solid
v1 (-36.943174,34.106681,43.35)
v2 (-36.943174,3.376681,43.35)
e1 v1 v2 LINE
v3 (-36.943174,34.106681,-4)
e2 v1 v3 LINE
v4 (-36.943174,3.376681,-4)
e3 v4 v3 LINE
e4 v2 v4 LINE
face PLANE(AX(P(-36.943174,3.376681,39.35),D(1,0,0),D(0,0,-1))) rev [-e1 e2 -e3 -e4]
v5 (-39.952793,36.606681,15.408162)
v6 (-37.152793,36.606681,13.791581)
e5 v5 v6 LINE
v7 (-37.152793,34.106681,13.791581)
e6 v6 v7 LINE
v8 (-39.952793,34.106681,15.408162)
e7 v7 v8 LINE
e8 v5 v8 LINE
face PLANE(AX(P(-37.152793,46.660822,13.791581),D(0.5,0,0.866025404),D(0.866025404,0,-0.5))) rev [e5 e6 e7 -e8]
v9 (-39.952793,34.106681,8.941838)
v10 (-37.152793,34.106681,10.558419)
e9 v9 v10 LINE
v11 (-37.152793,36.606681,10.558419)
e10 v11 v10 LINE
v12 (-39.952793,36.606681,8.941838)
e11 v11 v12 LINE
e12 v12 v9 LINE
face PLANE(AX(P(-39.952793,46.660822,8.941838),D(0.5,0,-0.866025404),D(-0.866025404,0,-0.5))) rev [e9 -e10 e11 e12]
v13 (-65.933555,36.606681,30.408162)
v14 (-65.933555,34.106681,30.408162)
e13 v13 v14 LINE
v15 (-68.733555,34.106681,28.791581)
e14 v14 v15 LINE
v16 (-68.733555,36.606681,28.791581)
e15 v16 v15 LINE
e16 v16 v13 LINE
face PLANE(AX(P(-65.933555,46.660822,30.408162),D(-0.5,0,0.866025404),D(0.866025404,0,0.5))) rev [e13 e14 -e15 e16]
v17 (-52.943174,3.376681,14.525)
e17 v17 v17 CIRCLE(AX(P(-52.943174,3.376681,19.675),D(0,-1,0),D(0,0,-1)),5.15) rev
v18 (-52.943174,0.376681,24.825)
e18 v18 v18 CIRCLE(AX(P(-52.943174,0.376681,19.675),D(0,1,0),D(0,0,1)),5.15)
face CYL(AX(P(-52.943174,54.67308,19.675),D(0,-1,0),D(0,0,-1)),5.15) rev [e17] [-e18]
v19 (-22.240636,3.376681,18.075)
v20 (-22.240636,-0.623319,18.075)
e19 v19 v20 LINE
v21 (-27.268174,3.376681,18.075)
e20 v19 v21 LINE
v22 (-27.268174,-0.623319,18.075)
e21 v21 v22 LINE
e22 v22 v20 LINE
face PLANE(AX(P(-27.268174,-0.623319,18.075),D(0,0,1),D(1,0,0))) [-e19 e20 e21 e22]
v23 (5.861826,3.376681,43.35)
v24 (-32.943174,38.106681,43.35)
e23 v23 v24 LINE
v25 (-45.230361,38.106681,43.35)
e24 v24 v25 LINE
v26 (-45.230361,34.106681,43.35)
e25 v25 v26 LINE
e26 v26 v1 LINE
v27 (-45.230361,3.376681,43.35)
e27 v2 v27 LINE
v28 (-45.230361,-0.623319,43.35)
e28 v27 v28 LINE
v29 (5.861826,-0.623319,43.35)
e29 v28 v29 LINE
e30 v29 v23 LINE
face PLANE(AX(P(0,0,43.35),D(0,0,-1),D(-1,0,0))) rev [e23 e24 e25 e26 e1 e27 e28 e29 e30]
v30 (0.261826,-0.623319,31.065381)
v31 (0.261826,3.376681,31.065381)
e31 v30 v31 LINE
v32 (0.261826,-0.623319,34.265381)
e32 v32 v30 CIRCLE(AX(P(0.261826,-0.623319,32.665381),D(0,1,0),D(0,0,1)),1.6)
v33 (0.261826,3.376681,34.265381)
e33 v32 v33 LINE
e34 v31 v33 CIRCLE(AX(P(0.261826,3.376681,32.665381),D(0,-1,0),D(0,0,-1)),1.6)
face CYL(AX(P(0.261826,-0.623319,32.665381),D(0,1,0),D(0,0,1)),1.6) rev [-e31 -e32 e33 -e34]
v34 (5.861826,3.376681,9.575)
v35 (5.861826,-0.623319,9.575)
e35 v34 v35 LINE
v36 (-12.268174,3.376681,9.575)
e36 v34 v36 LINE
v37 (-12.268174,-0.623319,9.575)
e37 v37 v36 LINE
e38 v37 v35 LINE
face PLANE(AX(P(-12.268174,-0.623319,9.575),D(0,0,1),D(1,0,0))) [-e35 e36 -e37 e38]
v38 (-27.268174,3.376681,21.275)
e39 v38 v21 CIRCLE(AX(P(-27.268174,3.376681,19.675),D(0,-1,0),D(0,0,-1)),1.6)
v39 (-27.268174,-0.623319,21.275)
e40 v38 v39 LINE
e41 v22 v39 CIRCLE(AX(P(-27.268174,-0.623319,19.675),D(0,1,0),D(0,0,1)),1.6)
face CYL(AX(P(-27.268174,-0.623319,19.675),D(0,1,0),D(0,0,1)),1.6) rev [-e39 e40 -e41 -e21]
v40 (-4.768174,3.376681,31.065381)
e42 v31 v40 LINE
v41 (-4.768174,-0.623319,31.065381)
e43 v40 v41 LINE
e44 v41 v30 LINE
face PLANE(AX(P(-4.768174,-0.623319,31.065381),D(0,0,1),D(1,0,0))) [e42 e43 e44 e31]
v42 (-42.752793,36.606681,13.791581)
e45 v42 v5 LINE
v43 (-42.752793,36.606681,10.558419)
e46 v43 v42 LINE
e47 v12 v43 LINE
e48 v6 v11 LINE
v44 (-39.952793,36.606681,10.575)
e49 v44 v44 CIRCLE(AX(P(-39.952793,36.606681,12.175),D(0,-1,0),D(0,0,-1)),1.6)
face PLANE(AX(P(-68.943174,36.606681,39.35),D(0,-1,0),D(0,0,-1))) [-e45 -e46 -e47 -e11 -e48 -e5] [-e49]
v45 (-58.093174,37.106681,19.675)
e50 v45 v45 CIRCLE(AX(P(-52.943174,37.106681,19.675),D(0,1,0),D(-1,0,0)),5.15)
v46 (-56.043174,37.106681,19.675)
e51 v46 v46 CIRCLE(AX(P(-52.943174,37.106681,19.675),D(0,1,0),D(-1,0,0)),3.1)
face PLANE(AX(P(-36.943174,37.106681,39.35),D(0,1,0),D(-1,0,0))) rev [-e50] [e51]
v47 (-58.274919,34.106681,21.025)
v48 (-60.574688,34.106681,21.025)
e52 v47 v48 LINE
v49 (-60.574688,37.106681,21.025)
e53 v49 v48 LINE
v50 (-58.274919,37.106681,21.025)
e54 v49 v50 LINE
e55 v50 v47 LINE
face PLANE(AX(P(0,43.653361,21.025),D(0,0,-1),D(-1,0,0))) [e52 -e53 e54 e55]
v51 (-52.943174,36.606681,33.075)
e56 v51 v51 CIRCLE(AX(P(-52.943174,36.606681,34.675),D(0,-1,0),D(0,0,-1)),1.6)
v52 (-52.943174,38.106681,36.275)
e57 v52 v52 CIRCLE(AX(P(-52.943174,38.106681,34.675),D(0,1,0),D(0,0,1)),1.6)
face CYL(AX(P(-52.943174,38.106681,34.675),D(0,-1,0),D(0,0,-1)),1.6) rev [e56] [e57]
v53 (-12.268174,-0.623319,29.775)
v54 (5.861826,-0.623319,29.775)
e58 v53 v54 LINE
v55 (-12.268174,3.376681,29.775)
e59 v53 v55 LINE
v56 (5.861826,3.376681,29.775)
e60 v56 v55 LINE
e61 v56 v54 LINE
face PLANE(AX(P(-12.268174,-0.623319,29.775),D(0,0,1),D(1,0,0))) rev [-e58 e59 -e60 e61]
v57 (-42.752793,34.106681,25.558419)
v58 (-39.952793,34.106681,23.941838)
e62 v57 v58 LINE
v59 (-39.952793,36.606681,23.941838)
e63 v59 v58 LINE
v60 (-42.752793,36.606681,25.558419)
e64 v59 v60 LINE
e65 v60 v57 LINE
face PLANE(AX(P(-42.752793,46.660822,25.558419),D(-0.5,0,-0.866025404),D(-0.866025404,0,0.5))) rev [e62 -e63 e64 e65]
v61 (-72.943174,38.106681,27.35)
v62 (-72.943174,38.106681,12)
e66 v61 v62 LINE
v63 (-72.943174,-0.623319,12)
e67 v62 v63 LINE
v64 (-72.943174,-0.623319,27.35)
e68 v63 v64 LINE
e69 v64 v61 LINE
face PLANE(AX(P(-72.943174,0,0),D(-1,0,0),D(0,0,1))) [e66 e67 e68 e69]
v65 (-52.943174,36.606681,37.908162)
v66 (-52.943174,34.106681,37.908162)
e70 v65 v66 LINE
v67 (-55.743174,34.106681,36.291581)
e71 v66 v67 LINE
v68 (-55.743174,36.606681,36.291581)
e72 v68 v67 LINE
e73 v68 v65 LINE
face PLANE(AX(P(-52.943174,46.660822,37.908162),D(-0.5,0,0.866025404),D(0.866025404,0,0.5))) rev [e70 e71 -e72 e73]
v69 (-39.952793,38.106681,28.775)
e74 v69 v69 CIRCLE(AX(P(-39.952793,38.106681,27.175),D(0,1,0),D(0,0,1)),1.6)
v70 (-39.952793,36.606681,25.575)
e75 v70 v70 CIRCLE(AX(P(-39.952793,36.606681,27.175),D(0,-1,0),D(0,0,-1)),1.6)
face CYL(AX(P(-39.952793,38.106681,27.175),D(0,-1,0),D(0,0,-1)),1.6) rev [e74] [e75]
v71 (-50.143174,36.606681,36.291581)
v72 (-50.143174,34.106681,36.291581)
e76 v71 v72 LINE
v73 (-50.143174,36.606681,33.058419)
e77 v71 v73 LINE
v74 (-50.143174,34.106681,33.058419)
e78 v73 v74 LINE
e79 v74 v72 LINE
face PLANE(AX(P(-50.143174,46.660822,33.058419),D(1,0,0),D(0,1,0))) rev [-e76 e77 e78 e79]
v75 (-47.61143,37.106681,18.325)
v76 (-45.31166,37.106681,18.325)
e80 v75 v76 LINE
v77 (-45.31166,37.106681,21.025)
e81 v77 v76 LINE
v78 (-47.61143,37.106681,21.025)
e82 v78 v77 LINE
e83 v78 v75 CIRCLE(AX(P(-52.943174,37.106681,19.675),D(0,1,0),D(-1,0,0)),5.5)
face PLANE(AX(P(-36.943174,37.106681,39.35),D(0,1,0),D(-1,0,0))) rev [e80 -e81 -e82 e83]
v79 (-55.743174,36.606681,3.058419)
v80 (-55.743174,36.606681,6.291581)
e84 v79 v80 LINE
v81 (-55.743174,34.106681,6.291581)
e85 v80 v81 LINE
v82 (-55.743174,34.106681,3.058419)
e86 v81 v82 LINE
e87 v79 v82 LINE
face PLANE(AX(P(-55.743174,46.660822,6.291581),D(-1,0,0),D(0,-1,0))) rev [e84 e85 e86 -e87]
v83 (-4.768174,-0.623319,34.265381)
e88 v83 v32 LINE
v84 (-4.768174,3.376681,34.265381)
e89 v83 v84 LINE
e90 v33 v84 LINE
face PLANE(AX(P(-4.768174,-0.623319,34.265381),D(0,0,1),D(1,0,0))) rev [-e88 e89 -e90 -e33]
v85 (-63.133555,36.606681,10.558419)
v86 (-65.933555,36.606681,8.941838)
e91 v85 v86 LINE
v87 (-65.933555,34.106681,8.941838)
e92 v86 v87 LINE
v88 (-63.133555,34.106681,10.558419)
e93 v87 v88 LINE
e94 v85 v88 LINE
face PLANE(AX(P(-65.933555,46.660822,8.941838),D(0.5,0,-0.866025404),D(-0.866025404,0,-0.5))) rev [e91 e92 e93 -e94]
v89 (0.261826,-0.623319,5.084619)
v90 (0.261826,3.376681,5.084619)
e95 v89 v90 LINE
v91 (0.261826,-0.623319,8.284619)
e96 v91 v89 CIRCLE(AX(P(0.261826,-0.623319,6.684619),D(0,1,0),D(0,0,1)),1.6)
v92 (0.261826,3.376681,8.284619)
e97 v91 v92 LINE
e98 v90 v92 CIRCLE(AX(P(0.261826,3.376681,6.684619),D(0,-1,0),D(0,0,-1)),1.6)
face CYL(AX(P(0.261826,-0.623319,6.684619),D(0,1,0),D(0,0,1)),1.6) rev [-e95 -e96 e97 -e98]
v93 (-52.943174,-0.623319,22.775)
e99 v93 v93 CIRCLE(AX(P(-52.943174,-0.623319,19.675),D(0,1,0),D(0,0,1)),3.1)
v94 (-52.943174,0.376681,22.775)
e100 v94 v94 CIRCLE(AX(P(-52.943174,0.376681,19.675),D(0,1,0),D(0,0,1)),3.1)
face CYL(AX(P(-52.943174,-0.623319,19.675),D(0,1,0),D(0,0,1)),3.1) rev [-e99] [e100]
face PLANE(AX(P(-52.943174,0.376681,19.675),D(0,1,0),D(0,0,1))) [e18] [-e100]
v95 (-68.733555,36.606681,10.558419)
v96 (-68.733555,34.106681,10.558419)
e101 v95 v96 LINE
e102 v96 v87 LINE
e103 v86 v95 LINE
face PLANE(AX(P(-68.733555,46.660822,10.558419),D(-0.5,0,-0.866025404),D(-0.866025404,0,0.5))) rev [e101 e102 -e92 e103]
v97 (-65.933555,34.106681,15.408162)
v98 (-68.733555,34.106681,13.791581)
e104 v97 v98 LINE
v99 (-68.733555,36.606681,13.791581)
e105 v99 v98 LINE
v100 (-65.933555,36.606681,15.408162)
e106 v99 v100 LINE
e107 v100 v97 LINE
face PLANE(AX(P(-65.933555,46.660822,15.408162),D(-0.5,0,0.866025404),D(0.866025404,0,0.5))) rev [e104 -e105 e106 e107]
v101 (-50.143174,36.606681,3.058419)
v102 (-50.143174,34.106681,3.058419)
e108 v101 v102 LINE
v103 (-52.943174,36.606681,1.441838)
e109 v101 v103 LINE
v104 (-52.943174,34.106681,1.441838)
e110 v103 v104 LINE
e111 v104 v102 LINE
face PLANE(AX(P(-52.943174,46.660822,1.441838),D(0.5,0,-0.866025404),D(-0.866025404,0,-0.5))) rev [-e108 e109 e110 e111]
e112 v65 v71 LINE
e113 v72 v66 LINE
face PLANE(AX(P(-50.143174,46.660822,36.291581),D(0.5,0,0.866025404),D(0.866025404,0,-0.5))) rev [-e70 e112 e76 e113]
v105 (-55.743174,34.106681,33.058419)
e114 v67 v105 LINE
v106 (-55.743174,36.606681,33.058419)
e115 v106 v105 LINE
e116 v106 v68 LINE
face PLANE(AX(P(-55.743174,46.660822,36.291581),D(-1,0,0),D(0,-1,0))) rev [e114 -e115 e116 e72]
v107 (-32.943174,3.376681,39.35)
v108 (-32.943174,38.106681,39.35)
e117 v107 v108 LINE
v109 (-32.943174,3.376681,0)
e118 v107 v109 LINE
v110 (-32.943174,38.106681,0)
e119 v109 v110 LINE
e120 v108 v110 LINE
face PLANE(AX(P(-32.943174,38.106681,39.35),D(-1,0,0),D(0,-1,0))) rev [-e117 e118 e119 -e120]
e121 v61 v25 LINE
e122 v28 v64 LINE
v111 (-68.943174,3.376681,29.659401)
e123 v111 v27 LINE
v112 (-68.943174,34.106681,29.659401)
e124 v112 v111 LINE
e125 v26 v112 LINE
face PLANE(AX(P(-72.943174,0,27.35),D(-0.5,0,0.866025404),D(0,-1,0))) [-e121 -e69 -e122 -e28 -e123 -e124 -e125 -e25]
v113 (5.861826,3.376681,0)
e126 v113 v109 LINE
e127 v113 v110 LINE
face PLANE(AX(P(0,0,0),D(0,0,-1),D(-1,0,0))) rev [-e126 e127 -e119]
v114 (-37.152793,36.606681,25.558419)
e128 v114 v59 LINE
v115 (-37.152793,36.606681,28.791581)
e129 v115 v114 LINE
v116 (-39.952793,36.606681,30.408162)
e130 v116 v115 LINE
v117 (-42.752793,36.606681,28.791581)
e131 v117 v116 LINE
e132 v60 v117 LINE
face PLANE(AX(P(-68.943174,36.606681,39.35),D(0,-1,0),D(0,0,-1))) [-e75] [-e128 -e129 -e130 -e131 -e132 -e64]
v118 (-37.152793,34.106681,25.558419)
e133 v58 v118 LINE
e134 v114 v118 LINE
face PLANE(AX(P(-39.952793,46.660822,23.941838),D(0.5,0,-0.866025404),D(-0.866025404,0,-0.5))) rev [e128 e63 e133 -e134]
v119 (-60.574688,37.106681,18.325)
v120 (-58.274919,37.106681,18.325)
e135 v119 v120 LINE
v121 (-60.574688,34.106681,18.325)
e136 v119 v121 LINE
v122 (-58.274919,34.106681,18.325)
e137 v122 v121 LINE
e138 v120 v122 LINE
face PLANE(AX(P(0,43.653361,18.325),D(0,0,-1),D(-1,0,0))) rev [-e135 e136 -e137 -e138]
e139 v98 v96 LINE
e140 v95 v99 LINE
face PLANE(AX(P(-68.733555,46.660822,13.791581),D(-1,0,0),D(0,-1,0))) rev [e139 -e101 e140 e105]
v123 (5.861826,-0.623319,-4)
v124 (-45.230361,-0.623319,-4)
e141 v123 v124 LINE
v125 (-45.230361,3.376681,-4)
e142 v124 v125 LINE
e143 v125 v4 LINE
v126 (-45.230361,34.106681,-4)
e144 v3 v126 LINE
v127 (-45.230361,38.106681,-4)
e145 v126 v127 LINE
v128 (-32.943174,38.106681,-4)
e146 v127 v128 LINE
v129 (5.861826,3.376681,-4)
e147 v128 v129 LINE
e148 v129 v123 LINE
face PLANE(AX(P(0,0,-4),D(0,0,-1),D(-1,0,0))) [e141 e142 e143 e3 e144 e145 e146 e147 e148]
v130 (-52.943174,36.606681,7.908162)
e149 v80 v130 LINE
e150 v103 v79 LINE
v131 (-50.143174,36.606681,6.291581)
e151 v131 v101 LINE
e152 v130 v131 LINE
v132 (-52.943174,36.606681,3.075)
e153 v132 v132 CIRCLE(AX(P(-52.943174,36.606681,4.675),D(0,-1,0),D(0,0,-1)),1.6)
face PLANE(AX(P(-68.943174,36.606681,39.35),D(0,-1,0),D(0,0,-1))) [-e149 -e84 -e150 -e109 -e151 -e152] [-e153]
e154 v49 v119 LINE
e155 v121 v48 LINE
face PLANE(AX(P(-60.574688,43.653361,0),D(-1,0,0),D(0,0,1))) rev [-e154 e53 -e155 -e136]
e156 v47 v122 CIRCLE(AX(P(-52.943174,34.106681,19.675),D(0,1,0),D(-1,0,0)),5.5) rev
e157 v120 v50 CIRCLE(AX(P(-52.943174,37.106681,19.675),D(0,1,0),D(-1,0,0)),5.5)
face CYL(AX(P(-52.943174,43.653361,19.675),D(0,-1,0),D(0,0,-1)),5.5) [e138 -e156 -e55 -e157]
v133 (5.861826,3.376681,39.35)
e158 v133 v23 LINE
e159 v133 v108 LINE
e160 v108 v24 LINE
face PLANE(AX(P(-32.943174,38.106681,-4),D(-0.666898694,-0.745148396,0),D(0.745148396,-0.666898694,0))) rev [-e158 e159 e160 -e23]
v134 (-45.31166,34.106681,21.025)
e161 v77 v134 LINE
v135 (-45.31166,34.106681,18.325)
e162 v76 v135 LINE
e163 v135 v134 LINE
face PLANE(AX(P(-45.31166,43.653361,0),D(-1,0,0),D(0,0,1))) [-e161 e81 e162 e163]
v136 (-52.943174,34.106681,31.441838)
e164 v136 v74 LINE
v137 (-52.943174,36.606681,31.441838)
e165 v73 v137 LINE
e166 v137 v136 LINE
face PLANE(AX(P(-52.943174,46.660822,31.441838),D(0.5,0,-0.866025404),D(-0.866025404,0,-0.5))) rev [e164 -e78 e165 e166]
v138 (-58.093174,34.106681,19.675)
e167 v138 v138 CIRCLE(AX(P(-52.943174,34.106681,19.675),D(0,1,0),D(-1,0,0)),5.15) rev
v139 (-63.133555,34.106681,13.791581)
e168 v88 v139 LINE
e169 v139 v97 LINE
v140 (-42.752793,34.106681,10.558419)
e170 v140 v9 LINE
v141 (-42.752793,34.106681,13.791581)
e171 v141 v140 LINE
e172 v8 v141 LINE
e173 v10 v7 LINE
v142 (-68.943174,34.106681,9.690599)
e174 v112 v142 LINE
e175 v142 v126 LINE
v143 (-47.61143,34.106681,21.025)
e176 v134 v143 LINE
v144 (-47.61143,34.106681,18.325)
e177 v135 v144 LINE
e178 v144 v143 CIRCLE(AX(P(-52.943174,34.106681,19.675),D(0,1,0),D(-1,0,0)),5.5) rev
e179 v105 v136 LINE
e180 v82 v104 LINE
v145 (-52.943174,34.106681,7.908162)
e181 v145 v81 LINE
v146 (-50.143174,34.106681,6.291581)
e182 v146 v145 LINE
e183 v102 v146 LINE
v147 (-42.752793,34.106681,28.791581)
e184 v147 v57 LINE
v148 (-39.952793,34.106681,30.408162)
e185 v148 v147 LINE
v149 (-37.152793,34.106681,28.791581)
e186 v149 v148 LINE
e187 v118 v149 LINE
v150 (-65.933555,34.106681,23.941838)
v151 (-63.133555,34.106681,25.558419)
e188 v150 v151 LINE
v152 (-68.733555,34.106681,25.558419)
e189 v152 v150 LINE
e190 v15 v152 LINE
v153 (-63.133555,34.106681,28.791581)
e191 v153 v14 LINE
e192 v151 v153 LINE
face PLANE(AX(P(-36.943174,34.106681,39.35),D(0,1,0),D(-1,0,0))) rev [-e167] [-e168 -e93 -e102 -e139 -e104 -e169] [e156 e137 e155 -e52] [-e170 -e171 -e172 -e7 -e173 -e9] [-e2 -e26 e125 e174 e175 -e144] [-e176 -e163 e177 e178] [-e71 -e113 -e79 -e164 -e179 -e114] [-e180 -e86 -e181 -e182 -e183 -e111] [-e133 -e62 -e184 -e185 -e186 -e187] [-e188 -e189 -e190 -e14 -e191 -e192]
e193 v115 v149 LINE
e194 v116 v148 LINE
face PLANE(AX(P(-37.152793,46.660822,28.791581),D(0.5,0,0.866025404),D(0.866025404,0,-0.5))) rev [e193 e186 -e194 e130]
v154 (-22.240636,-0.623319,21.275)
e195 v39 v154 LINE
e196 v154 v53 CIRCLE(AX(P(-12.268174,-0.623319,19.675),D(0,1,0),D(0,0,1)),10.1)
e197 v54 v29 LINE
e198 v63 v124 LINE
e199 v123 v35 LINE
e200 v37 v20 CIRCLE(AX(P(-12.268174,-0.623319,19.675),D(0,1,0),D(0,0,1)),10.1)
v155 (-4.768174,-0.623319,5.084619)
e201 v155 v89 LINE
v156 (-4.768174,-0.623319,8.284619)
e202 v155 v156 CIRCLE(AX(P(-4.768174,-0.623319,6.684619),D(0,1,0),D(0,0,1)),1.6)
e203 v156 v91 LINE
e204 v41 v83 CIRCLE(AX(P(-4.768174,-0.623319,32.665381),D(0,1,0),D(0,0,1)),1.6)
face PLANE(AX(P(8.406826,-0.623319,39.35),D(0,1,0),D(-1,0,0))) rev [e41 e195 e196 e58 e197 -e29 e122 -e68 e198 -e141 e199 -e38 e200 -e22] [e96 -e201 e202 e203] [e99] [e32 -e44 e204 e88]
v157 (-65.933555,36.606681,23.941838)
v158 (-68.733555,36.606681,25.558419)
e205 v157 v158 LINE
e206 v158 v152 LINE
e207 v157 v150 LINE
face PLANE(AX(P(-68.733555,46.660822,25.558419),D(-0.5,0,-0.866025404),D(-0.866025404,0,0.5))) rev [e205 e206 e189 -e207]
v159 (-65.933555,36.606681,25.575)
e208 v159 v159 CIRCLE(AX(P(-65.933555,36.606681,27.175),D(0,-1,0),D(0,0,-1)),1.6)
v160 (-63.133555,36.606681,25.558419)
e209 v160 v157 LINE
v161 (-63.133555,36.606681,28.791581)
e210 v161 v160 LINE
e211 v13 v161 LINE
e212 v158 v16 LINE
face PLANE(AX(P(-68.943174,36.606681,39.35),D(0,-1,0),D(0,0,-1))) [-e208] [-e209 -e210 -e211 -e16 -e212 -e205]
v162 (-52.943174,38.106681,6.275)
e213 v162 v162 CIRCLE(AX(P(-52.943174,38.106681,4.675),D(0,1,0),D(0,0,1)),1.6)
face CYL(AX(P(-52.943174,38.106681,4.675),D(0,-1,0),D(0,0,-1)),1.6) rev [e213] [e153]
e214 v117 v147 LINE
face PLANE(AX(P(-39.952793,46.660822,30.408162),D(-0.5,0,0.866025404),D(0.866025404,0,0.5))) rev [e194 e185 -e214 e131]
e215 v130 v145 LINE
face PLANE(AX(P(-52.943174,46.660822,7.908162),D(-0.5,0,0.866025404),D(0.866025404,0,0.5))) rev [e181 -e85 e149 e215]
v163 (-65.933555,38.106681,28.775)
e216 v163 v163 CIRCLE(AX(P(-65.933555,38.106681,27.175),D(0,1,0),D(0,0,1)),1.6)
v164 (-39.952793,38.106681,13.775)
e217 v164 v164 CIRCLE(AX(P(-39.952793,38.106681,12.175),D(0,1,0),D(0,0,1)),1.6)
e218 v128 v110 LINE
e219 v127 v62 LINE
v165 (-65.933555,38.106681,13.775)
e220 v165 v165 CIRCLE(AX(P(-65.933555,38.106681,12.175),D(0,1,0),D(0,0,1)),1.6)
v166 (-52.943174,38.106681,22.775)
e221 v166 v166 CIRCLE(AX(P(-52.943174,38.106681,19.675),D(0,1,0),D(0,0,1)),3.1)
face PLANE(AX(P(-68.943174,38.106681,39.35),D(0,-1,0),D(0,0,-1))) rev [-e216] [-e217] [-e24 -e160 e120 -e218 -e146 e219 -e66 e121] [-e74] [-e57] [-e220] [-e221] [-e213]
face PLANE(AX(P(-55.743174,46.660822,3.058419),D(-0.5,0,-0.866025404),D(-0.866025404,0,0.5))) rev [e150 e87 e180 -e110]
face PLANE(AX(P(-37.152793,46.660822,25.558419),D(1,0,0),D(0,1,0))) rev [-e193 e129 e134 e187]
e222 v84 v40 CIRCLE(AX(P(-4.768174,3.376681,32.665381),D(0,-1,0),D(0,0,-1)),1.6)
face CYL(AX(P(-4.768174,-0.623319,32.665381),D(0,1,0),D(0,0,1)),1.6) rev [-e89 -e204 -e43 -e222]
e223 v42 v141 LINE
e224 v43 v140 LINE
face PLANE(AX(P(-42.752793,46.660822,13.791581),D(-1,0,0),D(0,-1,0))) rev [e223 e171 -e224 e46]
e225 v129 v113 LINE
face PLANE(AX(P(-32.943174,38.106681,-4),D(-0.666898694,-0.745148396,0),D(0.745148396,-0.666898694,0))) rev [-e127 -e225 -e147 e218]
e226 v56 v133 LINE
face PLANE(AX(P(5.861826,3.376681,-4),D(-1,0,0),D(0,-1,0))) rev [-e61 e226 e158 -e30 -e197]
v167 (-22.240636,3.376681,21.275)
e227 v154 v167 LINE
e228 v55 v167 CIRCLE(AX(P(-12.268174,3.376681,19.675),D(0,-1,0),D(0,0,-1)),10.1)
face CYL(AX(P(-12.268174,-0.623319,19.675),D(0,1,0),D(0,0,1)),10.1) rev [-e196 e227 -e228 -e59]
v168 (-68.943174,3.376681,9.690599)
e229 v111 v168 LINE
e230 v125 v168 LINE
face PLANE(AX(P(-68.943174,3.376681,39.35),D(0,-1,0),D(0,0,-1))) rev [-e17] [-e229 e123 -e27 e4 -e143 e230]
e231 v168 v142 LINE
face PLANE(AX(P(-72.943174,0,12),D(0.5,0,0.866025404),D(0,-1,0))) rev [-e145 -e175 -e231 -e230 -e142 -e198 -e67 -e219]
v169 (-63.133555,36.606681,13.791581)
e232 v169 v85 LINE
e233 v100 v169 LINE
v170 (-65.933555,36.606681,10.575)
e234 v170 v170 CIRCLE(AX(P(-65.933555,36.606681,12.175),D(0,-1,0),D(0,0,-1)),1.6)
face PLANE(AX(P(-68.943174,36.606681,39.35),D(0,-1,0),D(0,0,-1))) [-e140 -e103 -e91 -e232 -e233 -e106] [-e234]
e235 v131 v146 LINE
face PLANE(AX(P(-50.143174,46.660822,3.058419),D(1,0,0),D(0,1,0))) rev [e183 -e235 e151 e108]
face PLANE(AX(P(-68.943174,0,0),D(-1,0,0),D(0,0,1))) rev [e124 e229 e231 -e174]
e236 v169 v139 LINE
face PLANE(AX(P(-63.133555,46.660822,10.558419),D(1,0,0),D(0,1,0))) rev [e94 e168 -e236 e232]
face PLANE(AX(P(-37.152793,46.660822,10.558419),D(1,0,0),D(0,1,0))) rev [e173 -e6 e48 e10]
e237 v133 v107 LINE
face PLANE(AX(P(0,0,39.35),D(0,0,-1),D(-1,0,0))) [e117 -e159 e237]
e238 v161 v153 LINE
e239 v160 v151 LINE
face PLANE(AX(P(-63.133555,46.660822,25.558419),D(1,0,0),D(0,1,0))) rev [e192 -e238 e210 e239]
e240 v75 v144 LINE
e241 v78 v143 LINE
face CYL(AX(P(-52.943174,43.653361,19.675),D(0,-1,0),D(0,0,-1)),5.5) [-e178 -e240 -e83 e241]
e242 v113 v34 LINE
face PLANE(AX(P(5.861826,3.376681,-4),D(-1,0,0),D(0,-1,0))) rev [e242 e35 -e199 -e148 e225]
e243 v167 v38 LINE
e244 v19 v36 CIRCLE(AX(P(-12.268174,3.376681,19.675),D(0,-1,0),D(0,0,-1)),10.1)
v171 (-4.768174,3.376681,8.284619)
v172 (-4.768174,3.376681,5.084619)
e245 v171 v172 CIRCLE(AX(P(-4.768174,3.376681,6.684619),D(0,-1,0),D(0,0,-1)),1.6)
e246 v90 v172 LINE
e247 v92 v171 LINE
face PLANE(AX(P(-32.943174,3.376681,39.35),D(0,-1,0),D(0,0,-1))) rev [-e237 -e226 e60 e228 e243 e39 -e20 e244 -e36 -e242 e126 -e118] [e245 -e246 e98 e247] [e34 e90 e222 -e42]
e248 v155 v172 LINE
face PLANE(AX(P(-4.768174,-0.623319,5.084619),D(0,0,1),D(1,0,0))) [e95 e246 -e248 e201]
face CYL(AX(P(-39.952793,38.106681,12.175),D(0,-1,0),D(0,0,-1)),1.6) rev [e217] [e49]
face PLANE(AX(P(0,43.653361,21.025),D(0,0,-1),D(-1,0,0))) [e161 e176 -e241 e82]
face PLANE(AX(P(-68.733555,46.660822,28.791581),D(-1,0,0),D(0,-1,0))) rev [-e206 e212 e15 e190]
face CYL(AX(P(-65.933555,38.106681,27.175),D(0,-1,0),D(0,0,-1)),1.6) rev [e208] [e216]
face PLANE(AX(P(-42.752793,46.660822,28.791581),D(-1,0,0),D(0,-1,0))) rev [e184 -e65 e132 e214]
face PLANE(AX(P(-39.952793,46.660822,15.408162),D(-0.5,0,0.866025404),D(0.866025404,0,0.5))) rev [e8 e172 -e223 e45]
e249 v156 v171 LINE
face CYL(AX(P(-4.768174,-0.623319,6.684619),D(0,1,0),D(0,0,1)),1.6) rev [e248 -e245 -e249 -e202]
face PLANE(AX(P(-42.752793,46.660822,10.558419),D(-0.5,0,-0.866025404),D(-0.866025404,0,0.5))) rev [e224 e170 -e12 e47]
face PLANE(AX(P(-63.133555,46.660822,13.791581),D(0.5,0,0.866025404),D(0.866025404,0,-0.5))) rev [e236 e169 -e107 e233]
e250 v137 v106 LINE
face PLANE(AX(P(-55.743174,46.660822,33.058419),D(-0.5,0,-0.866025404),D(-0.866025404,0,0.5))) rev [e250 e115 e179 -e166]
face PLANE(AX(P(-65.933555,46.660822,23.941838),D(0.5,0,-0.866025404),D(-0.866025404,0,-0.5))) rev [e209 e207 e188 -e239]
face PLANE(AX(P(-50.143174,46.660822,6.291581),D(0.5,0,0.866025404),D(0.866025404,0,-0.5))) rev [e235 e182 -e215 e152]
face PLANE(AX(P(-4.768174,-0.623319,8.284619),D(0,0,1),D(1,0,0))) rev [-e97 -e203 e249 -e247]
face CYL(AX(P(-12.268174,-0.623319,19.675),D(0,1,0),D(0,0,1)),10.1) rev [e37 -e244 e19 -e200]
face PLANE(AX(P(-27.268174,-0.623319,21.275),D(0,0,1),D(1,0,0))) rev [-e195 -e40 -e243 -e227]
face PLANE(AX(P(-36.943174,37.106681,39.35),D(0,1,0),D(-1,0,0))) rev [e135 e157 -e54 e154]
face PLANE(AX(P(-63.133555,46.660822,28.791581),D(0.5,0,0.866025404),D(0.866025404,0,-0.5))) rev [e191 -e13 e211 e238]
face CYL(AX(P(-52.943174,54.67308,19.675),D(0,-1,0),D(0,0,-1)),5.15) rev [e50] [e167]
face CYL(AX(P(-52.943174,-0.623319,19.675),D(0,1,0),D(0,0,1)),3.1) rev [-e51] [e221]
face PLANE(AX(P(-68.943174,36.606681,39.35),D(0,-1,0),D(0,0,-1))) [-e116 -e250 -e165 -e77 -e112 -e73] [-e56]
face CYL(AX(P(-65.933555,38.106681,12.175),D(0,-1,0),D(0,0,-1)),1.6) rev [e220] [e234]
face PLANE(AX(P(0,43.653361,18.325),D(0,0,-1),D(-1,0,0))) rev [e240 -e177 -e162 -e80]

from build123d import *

# Parameters (mm, degrees)
BOSS_EXTRUDE1_DEPTH     = 39.35
CUT_EXTRUDE2_DEPTH      = 33.73
CUT_EXTRUDE2_DEPTH_BACK = 3
SKETCH3_R               = 5.15
CUT_EXTRUDE3_DEPTH      = 33.73
CUT_EXTRUDE4_DEPTH      = 87.647311883
CUT_EXTRUDE4_DEPTH_BACK = 87.647311883
SKETCH3_5_R             = 3.1
SKETCH3_5_R_2           = 10.1
SKETCH3_5_R_3           = 1.6
SKETCH3_5_W             = 20.675
SKETCH3_5_H             = 20.2
SKETCH3_5_W_2           = 5.027537917
SKETCH3_5_H_2           = 3.2
SKETCH3_5_W_3           = 5.03
SKETCH3_6_R             = 1.6
CUT_EXTRUDE5_DEPTH      = 87.647311883
BOSS_EXTRUDE2_DEPTH     = 4
BOSS_EXTRUDE3_DEPTH     = 4
CUT_EXTRUDE6_DEPTH      = 92.909209967
CUT_EXTRUDE6_DEPTH_BACK = 92.909209967
CUT_EXTRUDE7_DEPTH      = 2.5
SKETCH10_W              = 47.35
SKETCH10_H              = 38.73
BOSS_EXTRUDE5_DEPTH     = 4
CHAMFER3_SIZE           = 16
CHAMFER3_SIZE_2         = 27.712812921


with BuildPart() as part:
    # Sketch1 → Boss-Extrude1 (new body)
    with BuildSketch(Plane.XY):
        Polygon((-68.943174111, 38.106680783), (-32.943174111, 38.106680783), (-32.943174111, 3.376680783), (8.406825889, 3.376680783), (8.406825889, -0.623319217), (-68.943174111, -0.623319217), (-68.943174111, 3.376680783), (-36.943174111, 3.376680783), (-36.943174111, 34.106680783), (-68.943174111, 34.106680783), align=None)
    extrude(amount=BOSS_EXTRUDE1_DEPTH)

    # Sketch3 → Cut-Extrude2 (cut, two sides: drawn at the far end of the back side and taken through both)
    with BuildSketch(Plane(origin=(0, 3.376680783, 0), x_dir=(1, 0, 0), z_dir=(0, 1, 0)).offset(-CUT_EXTRUDE2_DEPTH_BACK)):
        with Locations(Location((-52.943174111, -19.675, 0), (0, 0, 90))):
            Circle(SKETCH3_R)
    extrude(amount=CUT_EXTRUDE2_DEPTH + CUT_EXTRUDE2_DEPTH_BACK, mode=Mode.SUBTRACT)

    # Sketch3<4> → Cut-Extrude3 (cut)
    with BuildSketch(Plane(origin=(0, 3.376680783, 0), x_dir=(1, 0, 0), z_dir=(0, 1, 0))):
        with BuildLine():
            Line((-47.611429556, -21.025), (-45.3116605, -21.025))
            Line((-45.3116605, -21.025), (-45.3116605, -18.325))
            Line((-45.3116605, -18.325), (-47.611429556, -18.325))
            ThreePointArc((-47.611429556, -18.325), (-47.485400066, -18.994777629), (-47.443174111, -19.675))
            ThreePointArc((-47.443174111, -19.675), (-47.485400066, -20.355222371), (-47.611429556, -21.025))
        make_face()
        with BuildLine():
            Line((-60.574687722, -18.325), (-60.574687722, -21.025))
            Line((-60.574687722, -21.025), (-58.274918666, -21.025))
            ThreePointArc((-58.274918666, -21.025), (-58.443174111, -19.675), (-58.274918666, -18.325))
            Line((-58.274918666, -18.325), (-60.574687722, -18.325))
        make_face()
    extrude(amount=CUT_EXTRUDE3_DEPTH, mode=Mode.SUBTRACT)

    # Sketch3<5> → Cut-Extrude4 (cut, two sides: drawn at the far end of the back side and taken through both)
    with BuildSketch(Plane(origin=(0, 3.376680783, 0), x_dir=(1, 0, 0), z_dir=(0, 1, 0)).offset(-CUT_EXTRUDE4_DEPTH_BACK)):
        with Locations(Location((-52.943174111, -19.675, 0), (0, 0, 270))):
            Circle(SKETCH3_5_R)
        with Locations((-12.268174111, -19.675)):
            Circle(SKETCH3_5_R_2)
        with Locations((-4.768174111, -32.665381057)):
            Circle(SKETCH3_5_R_3)
        with Locations((-4.768174111, -6.684618943)):
            Circle(SKETCH3_5_R_3)
        with Locations((-27.268174111, -19.675)):
            Circle(SKETCH3_5_R_3)
        with Locations((0.261825889, -32.665381057)):
            Circle(SKETCH3_5_R_3)
        with Locations((0.261825889, -6.684618943)):
            Circle(SKETCH3_5_R_3)
        with Locations((-1.930674111, -19.675)):
            Rectangle(SKETCH3_5_W, SKETCH3_5_H)
        with Locations((-24.754405152, -19.675)):
            Rectangle(SKETCH3_5_W_2, SKETCH3_5_H_2)
        with Locations((-2.253174111, -32.665381057)):
            Rectangle(SKETCH3_5_W_3, SKETCH3_5_H_2)
        with Locations((-2.253174111, -6.684618943)):
            Rectangle(SKETCH3_5_W_3, SKETCH3_5_H_2)
    extrude(amount=CUT_EXTRUDE4_DEPTH + CUT_EXTRUDE4_DEPTH_BACK, mode=Mode.SUBTRACT)

    # Sketch3<6> → Cut-Extrude5 (cut, through all)
    with BuildSketch(Plane(origin=(0, 3.376680783, 0), x_dir=(1, 0, 0), z_dir=(0, 1, 0))):
        with Locations(Location((-52.943174111, -34.675, 0), (0, 0, 180))):
            Circle(SKETCH3_6_R)
        with Locations(Location((-65.933555168, -27.175, 0), (0, 0, 180))):
            Circle(SKETCH3_6_R)
        with Locations(Location((-65.933555168, -12.175, 0), (0, 0, 180))):
            Circle(SKETCH3_6_R)
        with Locations(Location((-52.943174111, -4.675, 0), (0, 0, 180))):
            Circle(SKETCH3_6_R)
        with Locations(Location((-39.952793054, -12.175, 0), (0, 0, 180))):
            Circle(SKETCH3_6_R)
        with Locations(Location((-39.952793054, -27.175, 0), (0, 0, 180))):
            Circle(SKETCH3_6_R)
    extrude(amount=CUT_EXTRUDE5_DEPTH, mode=Mode.SUBTRACT)

    # Sketch4 → Boss-Extrude2 (add)
    with BuildSketch(Plane.XY.offset(39.35)):
        Polygon((-68.943174111, 38.106680783), (-68.943174111, 34.106680783), (-36.943174111, 34.106680783), (-36.943174111, 3.376680783), (-68.943174111, 3.376680783), (-68.943174111, -0.623319217), (8.406825889, -0.623319217), (8.406825889, 38.106680783), align=None)
    extrude(amount=BOSS_EXTRUDE2_DEPTH)

    # Sketch5 → Boss-Extrude3 (add)
    with BuildSketch(Plane(origin=(0, 0, 0), x_dir=(-1, 0, 0), z_dir=(0, 0, -1))):
        Polygon((68.943174111, 38.106680783), (68.943174111, 34.106680783), (36.943174111, 34.106680783), (36.943174111, 3.376680783), (68.943174111, 3.376680783), (68.943174111, -0.623319217), (-8.406825889, -0.623319217), (-8.406825889, 38.106680783), align=None)
    extrude(amount=BOSS_EXTRUDE3_DEPTH)

    # Sketch6 → Cut-Extrude6 (cut, two sides: drawn at the far end of the back side and taken through both)
    with BuildSketch(Plane.XY.offset(43.35).offset(-CUT_EXTRUDE6_DEPTH_BACK)):
        Polygon((-32.943174111, 38.106680783), (5.861825889, 3.376680783), (5.861825889, -0.623319217), (8.406825889, -0.623319217), (8.406825889, 38.106680783), align=None)
    extrude(amount=CUT_EXTRUDE6_DEPTH + CUT_EXTRUDE6_DEPTH_BACK, mode=Mode.SUBTRACT)

    # Sketch8 → Cut-Extrude7 (cut)
    with BuildSketch(Plane.XZ.offset(-34.106680783)):
        Polygon((-65.933555168, 15.408161507), (-68.733555168, 13.791580754), (-68.733555168, 10.558419246), (-65.933555168, 8.941838493), (-63.133555168, 10.558419246), (-63.133555168, 13.791580754), align=None)
        Polygon((-65.933555168, 30.408161507), (-68.733555168, 28.791580754), (-68.733555168, 25.558419246), (-65.933555168, 23.941838493), (-63.133555168, 25.558419246), (-63.133555168, 28.791580754), align=None)
        Polygon((-52.943174111, 1.441838493), (-50.143174111, 3.058419246), (-50.143174111, 6.291580754), (-52.943174111, 7.908161507), (-55.743174111, 6.291580754), (-55.743174111, 3.058419246), align=None)
        Polygon((-39.952793054, 8.941838493), (-37.152793054, 10.558419246), (-37.152793054, 13.791580754), (-39.952793054, 15.408161507), (-42.752793054, 13.791580754), (-42.752793054, 10.558419246), align=None)
        Polygon((-39.952793054, 23.941838493), (-37.152793054, 25.558419246), (-37.152793054, 28.791580754), (-39.952793054, 30.408161507), (-42.752793054, 28.791580754), (-42.752793054, 25.558419246), align=None)
        Polygon((-52.943174111, 37.908161507), (-55.743174111, 36.291580754), (-55.743174111, 33.058419246), (-52.943174111, 31.441838493), (-50.143174111, 33.058419246), (-50.143174111, 36.291580754), align=None)
    extrude(amount=-CUT_EXTRUDE7_DEPTH, mode=Mode.SUBTRACT)

    # Sketch10 → Boss-Extrude5 (add)
    with BuildSketch(Plane.ZY.offset(68.943174111)):
        with Locations((19.675, 18.741680783)):
            Rectangle(SKETCH10_W, SKETCH10_H)
    extrude(amount=BOSS_EXTRUDE5_DEPTH)

    # Chamfer3
    # the kernel refuses this chamfer: 27.712812921, 16 mm, written as the material it takes off along each edge
    with BuildSketch(Plane(origin=(-72.943174111, -72.318742746, -4), x_dir=(-0.05789386240267147, 0, 0.9983227437537926), z_dir=(0, 1, 0))) as chamfer3_piece_1:
        Polygon((CHAMFER3_SIZE * 0.998322743754, CHAMFER3_SIZE * 0.0578938624027), (-CHAMFER3_SIZE_2 * 0.0578938624029, CHAMFER3_SIZE_2 * 0.998322743757), (0, 0), align=None)
    extrude(amount=182.120847059, mode=Mode.SUBTRACT)
    with BuildSketch(Plane(origin=(-72.943174111, 109.802104312, 43.35), x_dir=(0.9998132206222079, 0, 0.019326765612700702), z_dir=(0, -1, 0))) as chamfer3_piece_2:
        Polygon((CHAMFER3_SIZE_2 * 0.999813220626, -CHAMFER3_SIZE_2 * 0.0193267656128), (-CHAMFER3_SIZE * 0.0193267656127, -CHAMFER3_SIZE * 0.999813220622), (0, 0), align=None)
    extrude(amount=182.120847059, mode=Mode.SUBTRACT)


solid = part.part
